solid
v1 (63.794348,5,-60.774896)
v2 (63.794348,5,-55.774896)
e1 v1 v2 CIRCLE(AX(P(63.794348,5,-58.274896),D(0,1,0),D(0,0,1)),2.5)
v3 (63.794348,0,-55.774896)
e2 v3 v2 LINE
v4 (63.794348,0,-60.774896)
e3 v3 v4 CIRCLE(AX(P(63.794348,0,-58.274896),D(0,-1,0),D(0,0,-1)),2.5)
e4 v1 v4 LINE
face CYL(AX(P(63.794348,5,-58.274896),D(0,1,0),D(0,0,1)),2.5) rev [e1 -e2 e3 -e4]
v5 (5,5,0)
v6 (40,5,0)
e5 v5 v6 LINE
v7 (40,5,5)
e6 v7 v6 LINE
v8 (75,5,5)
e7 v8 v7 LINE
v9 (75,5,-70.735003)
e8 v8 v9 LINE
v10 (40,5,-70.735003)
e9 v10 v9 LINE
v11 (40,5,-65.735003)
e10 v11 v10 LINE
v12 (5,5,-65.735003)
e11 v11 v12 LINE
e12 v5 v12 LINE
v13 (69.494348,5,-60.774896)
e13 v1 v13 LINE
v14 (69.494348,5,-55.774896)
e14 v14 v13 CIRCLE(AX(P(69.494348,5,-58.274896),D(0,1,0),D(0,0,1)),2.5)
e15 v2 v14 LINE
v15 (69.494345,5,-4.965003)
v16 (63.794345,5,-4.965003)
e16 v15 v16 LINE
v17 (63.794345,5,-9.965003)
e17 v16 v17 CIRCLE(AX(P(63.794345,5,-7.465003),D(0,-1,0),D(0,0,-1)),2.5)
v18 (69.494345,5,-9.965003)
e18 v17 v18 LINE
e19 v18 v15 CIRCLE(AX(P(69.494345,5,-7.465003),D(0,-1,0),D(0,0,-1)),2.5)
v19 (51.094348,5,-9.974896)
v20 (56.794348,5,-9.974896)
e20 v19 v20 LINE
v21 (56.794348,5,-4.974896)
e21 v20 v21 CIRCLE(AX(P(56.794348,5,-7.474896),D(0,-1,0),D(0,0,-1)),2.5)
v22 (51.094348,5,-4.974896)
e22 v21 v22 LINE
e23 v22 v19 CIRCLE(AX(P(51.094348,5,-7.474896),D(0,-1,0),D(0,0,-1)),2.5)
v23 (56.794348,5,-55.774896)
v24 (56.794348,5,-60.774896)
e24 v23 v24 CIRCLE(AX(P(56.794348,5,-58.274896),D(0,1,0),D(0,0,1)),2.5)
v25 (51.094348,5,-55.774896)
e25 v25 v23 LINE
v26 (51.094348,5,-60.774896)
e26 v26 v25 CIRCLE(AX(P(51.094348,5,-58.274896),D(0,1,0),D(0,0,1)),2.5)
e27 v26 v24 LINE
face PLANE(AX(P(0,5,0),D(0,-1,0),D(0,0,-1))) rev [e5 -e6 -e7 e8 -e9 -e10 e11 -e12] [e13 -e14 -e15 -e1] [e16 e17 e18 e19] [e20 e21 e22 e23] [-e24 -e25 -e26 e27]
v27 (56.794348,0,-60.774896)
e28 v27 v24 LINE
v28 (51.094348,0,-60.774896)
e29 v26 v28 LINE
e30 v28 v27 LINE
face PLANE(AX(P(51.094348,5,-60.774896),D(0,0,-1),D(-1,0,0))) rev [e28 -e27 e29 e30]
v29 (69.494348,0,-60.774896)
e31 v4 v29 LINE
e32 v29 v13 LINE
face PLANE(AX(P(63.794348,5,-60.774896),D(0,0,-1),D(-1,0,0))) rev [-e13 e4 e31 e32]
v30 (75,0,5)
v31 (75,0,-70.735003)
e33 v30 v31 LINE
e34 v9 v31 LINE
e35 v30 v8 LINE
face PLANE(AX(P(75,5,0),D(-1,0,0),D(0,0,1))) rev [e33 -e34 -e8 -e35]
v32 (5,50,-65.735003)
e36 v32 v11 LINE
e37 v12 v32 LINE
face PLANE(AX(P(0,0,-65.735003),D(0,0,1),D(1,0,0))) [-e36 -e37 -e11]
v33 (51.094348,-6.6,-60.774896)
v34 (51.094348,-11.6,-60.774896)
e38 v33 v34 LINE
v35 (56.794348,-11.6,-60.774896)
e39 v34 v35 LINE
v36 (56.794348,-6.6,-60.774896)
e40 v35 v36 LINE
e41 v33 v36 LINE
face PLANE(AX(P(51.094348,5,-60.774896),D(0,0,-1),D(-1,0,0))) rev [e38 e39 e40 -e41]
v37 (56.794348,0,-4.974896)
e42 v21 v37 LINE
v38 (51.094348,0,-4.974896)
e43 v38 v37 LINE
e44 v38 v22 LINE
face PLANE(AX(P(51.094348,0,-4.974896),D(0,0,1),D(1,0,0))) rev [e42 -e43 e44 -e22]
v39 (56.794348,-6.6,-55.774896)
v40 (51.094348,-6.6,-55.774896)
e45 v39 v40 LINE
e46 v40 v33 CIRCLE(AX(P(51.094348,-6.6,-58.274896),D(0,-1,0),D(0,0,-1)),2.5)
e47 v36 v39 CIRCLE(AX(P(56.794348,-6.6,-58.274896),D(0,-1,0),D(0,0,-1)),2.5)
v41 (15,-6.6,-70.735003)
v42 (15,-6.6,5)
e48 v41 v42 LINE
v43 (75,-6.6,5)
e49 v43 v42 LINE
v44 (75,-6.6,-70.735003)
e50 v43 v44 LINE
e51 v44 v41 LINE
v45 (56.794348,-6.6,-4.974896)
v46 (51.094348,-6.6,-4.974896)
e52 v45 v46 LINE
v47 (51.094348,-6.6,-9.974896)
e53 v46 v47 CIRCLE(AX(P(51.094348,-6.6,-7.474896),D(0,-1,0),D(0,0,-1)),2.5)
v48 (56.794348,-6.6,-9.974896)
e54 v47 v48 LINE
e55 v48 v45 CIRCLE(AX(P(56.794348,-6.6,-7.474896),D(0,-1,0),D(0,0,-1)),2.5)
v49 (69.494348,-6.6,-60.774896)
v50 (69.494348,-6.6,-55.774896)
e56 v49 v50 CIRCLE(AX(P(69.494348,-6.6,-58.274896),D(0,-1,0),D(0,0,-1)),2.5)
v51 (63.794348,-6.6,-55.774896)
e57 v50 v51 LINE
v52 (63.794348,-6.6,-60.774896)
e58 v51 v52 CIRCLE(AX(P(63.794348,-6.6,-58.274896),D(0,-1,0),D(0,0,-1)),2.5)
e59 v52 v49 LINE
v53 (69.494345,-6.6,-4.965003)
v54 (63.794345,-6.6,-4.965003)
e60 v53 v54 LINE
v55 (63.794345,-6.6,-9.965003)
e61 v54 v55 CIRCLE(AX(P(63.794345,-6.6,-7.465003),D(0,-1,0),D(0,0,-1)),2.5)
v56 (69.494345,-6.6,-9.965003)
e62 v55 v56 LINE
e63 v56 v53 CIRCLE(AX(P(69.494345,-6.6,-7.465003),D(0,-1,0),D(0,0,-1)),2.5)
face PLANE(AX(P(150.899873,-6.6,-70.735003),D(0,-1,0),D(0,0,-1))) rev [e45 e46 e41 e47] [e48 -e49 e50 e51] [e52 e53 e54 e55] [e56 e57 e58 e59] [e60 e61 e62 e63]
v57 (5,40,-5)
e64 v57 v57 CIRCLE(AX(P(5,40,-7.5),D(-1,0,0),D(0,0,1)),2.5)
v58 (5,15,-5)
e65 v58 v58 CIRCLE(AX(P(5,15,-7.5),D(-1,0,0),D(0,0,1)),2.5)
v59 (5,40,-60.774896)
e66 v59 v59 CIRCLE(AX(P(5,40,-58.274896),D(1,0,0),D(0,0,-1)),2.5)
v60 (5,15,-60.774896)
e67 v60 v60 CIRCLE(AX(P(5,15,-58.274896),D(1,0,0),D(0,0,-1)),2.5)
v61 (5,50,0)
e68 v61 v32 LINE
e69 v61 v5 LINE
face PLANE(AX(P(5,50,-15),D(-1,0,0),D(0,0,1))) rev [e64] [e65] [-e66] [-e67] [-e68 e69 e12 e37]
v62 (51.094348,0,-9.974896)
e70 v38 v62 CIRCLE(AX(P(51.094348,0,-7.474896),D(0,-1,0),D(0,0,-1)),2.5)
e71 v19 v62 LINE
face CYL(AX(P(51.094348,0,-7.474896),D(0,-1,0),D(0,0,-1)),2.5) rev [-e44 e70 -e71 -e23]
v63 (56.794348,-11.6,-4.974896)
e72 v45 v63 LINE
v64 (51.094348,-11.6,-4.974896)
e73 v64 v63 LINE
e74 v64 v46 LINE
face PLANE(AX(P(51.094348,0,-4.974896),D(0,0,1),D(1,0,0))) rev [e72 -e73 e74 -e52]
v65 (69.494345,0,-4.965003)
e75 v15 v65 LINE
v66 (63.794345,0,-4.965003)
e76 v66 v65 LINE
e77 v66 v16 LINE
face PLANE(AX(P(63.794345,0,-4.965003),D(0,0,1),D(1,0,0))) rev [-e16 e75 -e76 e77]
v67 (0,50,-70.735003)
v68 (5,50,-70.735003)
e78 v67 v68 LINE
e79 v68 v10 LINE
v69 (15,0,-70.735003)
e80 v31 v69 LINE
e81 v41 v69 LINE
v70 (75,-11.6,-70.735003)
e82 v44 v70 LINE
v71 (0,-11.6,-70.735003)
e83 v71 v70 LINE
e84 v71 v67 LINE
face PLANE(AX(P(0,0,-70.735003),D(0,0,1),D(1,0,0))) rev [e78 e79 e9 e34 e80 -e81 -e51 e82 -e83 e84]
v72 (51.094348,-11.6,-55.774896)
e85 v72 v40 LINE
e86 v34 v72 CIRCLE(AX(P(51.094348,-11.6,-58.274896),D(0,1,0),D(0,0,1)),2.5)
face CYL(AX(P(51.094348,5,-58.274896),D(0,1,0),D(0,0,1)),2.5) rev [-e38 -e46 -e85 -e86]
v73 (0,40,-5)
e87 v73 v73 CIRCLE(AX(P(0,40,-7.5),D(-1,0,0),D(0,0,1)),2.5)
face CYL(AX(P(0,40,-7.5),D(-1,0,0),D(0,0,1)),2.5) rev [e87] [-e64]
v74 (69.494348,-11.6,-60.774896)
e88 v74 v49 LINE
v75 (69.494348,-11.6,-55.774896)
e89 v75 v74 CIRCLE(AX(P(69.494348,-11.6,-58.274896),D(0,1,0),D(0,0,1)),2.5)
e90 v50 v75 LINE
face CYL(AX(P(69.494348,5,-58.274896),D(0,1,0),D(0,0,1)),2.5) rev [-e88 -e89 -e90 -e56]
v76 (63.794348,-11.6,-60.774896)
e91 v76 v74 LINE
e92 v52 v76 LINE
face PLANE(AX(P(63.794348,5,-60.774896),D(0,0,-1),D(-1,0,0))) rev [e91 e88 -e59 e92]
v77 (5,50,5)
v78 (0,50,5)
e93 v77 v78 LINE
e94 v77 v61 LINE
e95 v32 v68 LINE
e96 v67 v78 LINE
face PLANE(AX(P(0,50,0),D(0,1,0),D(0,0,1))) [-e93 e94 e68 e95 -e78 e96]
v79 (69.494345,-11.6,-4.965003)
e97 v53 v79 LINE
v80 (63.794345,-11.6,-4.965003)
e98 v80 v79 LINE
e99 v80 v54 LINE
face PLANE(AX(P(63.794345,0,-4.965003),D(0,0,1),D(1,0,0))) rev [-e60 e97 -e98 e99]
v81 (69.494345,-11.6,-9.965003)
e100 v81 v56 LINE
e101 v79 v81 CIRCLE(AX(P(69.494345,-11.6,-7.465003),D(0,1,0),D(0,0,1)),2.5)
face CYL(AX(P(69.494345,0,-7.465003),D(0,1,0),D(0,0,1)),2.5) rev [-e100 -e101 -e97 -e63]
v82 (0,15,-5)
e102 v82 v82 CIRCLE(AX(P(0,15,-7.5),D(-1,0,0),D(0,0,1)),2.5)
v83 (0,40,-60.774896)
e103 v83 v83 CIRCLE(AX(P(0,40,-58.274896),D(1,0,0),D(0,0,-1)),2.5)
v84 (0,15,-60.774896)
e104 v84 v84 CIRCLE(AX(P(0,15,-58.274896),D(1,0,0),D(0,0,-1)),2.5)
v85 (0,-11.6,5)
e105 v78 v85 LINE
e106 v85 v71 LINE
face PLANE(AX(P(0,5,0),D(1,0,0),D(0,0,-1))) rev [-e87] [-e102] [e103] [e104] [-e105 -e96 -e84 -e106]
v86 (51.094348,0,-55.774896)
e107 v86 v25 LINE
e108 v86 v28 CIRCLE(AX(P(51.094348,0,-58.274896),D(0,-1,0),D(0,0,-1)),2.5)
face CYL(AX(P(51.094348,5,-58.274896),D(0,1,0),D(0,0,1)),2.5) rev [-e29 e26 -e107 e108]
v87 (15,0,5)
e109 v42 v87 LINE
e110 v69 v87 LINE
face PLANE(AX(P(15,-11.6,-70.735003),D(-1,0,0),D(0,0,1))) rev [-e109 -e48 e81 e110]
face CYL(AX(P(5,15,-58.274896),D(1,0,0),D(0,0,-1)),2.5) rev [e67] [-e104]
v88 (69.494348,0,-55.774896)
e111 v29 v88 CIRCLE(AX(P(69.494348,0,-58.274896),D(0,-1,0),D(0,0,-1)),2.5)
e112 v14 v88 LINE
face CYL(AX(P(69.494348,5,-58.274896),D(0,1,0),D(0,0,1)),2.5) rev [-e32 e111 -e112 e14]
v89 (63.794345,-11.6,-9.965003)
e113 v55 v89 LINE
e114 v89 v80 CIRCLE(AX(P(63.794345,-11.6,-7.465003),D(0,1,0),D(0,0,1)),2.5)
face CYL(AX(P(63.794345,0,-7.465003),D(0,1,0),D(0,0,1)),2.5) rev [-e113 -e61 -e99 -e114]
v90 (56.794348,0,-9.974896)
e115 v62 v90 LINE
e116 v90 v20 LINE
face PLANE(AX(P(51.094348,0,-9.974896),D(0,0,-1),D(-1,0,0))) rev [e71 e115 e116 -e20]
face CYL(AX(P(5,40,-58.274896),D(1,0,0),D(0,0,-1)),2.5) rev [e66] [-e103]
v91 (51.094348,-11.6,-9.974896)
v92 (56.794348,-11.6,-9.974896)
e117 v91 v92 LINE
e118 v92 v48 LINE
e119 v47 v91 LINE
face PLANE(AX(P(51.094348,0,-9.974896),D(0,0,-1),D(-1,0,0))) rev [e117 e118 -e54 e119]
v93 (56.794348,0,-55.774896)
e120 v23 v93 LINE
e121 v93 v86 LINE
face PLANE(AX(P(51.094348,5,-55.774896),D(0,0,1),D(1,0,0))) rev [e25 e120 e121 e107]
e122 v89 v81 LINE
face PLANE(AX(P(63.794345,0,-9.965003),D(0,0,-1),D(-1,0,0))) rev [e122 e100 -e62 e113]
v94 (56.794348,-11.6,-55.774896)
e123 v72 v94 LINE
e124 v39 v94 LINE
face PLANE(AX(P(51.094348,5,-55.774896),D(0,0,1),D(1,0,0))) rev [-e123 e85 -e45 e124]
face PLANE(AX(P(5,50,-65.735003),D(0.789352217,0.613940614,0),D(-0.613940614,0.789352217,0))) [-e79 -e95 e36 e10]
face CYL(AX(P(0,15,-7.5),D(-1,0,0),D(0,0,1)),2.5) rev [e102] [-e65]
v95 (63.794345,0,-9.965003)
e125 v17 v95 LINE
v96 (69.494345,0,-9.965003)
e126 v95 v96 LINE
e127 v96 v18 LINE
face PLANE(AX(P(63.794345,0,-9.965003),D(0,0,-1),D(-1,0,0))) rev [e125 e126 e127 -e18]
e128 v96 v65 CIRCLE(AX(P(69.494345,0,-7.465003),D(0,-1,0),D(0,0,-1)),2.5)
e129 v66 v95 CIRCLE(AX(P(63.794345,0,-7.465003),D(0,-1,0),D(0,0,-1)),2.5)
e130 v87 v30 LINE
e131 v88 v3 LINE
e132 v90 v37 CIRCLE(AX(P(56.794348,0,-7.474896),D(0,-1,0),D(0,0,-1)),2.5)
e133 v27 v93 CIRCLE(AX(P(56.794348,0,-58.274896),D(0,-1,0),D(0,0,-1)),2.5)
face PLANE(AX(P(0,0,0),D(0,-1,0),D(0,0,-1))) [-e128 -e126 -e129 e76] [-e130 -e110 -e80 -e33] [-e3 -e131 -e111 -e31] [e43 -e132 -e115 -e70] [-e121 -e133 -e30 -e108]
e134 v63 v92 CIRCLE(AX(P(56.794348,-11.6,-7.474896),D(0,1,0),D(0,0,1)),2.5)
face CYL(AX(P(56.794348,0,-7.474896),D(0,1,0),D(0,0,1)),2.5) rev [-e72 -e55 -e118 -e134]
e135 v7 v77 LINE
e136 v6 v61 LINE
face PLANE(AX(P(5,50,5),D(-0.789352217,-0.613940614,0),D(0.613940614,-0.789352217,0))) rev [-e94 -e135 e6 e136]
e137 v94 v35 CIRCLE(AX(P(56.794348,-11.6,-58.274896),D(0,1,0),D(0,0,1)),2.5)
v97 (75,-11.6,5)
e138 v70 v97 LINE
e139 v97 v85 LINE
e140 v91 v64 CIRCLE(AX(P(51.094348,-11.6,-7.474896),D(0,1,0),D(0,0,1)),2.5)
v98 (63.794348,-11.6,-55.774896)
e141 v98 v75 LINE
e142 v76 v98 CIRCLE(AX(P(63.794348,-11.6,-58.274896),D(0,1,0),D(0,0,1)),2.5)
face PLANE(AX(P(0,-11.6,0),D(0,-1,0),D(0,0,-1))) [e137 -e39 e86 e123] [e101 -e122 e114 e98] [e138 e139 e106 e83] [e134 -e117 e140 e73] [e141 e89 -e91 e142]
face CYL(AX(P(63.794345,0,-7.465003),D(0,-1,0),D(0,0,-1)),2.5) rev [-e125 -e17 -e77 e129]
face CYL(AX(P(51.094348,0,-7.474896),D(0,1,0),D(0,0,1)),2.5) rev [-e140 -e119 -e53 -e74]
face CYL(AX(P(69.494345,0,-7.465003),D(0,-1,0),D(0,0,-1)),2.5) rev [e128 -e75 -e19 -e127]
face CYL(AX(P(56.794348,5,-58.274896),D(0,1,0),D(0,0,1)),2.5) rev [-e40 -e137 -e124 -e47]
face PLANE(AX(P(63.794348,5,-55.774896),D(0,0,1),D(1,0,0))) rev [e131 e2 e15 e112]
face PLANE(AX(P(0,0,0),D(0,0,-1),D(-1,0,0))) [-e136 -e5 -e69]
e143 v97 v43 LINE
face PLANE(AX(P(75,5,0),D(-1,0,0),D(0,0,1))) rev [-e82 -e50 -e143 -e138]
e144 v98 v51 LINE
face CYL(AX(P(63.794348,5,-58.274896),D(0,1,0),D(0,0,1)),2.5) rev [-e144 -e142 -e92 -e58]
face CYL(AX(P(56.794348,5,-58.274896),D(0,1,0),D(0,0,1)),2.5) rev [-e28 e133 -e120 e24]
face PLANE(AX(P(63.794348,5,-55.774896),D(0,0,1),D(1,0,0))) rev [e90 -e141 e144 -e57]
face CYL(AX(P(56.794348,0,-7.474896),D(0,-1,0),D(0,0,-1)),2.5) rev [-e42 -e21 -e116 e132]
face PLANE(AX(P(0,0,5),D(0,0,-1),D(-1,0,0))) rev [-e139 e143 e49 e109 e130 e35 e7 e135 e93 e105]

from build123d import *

# Parameters (mm, degrees)
SKETCH1_W                 = 75
SKETCH1_H                 = 15
BOSS_EXTRUDE1_DEPTH       = 5
SKETCH2_W                 = 5
SKETCH2_H                 = 15
BOSS_EXTRUDE2_DEPTH       = 45
F_5_0MM_DOWEL_HOLE1_D     = 5
F_6_0MM_DOWEL_SLOT1_DEPTH = 5
BOSS_EXTRUDE3_DEPTH       = 5
BOSS_EXTRUDE7_DEPTH       = 46.8
BOSS_EXTRUDE11_DEPTH      = 8.935003
SKETCH29_W                = 15
SKETCH29_H                = 75.73500344
BOSS_EXTRUDE12_DEPTH      = 11.6
SKETCH30_W                = 75.73500344
SKETCH30_H                = 5
BOSS_EXTRUDE13_DEPTH      = 60
BOSS_EXTRUDE14_DEPTH      = 5
F_5_0MM_START             = -11.6
F_5_0MM_DOWEL_SLOT2_DEPTH = 16.6
F_5_0MM_DOWEL_SLOT3_DEPTH = 5
F_5_0MM_DOWEL_HOLE2_D     = 5


# Read off the part's stored shape, not the designer's step: Ø6.0mm Dowel Slot1, Ø5.0mm Dowel Slot2, Ø5.0mm Dowel Slot3
with BuildPart() as part:
    # Sketch1 → Boss-Extrude1 (new body)
    with BuildSketch(Plane(origin=(0, 0, 0), x_dir=(1, 0, 0), z_dir=(0, 1, 0))):
        with Locations((37.5, 7.5)):
            Rectangle(SKETCH1_W, SKETCH1_H)
    extrude(amount=BOSS_EXTRUDE1_DEPTH)

    # Sketch2 → Boss-Extrude2 (add)
    with BuildSketch(Plane(origin=(0, 5, 0), x_dir=(1, 0, 0), z_dir=(0, 1, 0))):
        with Locations((2.5, 7.5)):
            Rectangle(SKETCH2_W, SKETCH2_H)
    extrude(amount=BOSS_EXTRUDE2_DEPTH)

    # Ø5.0mm Dowel Hole1 (through all)
    with Locations(Plane.ZY):
        with Locations((-7.5, 40), (-7.5, 15)):
            Hole(F_5_0MM_DOWEL_HOLE1_D / 2)

    # Ø6.0mm Dowel Slot1 outline → Ø6.0mm Dowel Slot1 (cut)
    with BuildSketch(Plane(origin=(0, 0, 0), x_dir=(1, 0, 0), z_dir=(0, 1, 0))):
        with BuildLine():
            ThreePointArc((69.494344615, 4.96500344), (71.994344615, 7.46500344), (69.494344615, 9.96500344))
            Line((69.494344615, 9.96500344), (63.794344615, 9.96500344))
            ThreePointArc((63.794344615, 9.96500344), (61.294344615, 7.46500344), (63.794344615, 4.96500344))
            Line((63.794344615, 4.96500344), (69.494344615, 4.96500344))
        make_face()
        with BuildLine():
            ThreePointArc((56.794348468, 4.974895546), (59.294348468, 7.474895546), (56.794348468, 9.974895546))
            Line((56.794348468, 9.974895546), (51.094348468, 9.974895546))
            ThreePointArc((51.094348468, 9.974895546), (48.594348468, 7.474895546), (51.094348468, 4.974895546))
            Line((51.094348468, 4.974895546), (56.794348468, 4.974895546))
        make_face()
    extrude(amount=F_6_0MM_DOWEL_SLOT1_DEPTH, mode=Mode.SUBTRACT)

    # Sketch10 → Boss-Extrude3 (add)
    with BuildSketch(Plane.XY):
        Polygon((5, 50), (40, 5), (75, 5), (75, 0), (0, 0), (0, 50), align=None)
    extrude(amount=BOSS_EXTRUDE3_DEPTH)

    # Sketch21 → Boss-Extrude7 (add)
    with BuildSketch(Plane(origin=(0, 0, -15), x_dir=(-1, 0, 0), z_dir=(0, 0, -1))):
        Polygon((-75, 5), (-5, 5), (-5, 50), (0, 50), (0, 0), (-75, 0), align=None)
    extrude(amount=BOSS_EXTRUDE7_DEPTH)

    # Sketch22 → Boss-Extrude11 (add)
    with BuildSketch(Plane(origin=(0, 0, -61.8), x_dir=(-1, 0, 0), z_dir=(0, 0, -1))):
        Polygon((-75, 5), (-40, 5), (-5, 5), (-5, 50), (0, 50), (0, 0), (-75, 0), align=None)
    extrude(amount=BOSS_EXTRUDE11_DEPTH)

    # Sketch29 → Boss-Extrude12 (add)
    with BuildSketch(Plane.XZ):
        with Locations((7.5, -32.86750172)):
            Rectangle(SKETCH29_W, SKETCH29_H)
    extrude(amount=BOSS_EXTRUDE12_DEPTH)

    # Sketch30 → Boss-Extrude13 (add)
    with BuildSketch(Plane(origin=(15, 0, 0), x_dir=(0, 0, -1), z_dir=(1, 0, 0))):
        with Locations((32.86750172, -9.1)):
            Rectangle(SKETCH30_W, SKETCH30_H)
    extrude(amount=BOSS_EXTRUDE13_DEPTH)

    # Sketch31 → Boss-Extrude14 (add)
    with BuildSketch(Plane(origin=(0, 0, -70.73500344), x_dir=(-1, 0, 0), z_dir=(0, 0, -1))):
        Polygon((-5, 50), (-40, 5), (-5, 5), align=None)
    extrude(amount=-BOSS_EXTRUDE14_DEPTH)

    # Ø5.0mm Dowel Slot2 outline → Ø5.0mm Dowel Slot2 (cut)
    with BuildSketch(Plane(origin=(0, 0, 0), x_dir=(1, 0, 0), z_dir=(0, 1, 0)).offset(F_5_0MM_START)):
        with BuildLine():
            ThreePointArc((56.794348468, 55.774895546), (59.294348468, 58.274895546), (56.794348468, 60.774895546))
            Line((56.794348468, 60.774895546), (51.094348468, 60.774895546))
            ThreePointArc((51.094348468, 60.774895546), (48.594348468, 58.274895546), (51.094348468, 55.774895546))
            Line((51.094348468, 55.774895546), (56.794348468, 55.774895546))
        make_face()
        with BuildLine():
            ThreePointArc((69.494348468, 55.774895546), (71.994348468, 58.274895546), (69.494348468, 60.774895546))
            Line((69.494348468, 60.774895546), (63.794348468, 60.774895546))
            ThreePointArc((63.794348468, 60.774895546), (61.294348468, 58.274895546), (63.794348468, 55.774895546))
            Line((63.794348468, 55.774895546), (69.494348468, 55.774895546))
        make_face()
    extrude(amount=F_5_0MM_DOWEL_SLOT2_DEPTH, mode=Mode.SUBTRACT)

    # Ø5.0mm Dowel Slot3 outline → Ø5.0mm Dowel Slot3 (cut)
    with BuildSketch(Plane(origin=(0, 0, 0), x_dir=(1, 0, 0), z_dir=(0, 1, 0)).offset(F_5_0MM_START)):
        with BuildLine():
            Line((63.794344615, 4.96500344), (69.494344615, 4.96500344))
            ThreePointArc((69.494344615, 4.96500344), (71.994344615, 7.46500344), (69.494344615, 9.96500344))
            Line((69.494344615, 9.96500344), (63.794344615, 9.96500344))
            ThreePointArc((63.794344615, 9.96500344), (61.294344615, 7.46500344), (63.794344615, 4.96500344))
        make_face()
        with BuildLine():
            Line((51.094348468, 4.974895546), (56.794348468, 4.974895546))
            ThreePointArc((56.794348468, 4.974895546), (59.294348468, 7.474895546), (56.794348468, 9.974895546))
            Line((56.794348468, 9.974895546), (51.094348468, 9.974895546))
            ThreePointArc((51.094348468, 9.974895546), (48.594348468, 7.474895546), (51.094348468, 4.974895546))
        make_face()
    extrude(amount=F_5_0MM_DOWEL_SLOT3_DEPTH, mode=Mode.SUBTRACT)

    # Ø5.0mm Dowel Hole2 (through all)
    with Locations(Plane(origin=(5, 0, 0), x_dir=(0, 0, -1), z_dir=(1, 0, 0))):
        with Locations((58.274895546, 40), (58.274895546, 15)):
            Hole(F_5_0MM_DOWEL_HOLE2_D / 2)


solid = part.part
